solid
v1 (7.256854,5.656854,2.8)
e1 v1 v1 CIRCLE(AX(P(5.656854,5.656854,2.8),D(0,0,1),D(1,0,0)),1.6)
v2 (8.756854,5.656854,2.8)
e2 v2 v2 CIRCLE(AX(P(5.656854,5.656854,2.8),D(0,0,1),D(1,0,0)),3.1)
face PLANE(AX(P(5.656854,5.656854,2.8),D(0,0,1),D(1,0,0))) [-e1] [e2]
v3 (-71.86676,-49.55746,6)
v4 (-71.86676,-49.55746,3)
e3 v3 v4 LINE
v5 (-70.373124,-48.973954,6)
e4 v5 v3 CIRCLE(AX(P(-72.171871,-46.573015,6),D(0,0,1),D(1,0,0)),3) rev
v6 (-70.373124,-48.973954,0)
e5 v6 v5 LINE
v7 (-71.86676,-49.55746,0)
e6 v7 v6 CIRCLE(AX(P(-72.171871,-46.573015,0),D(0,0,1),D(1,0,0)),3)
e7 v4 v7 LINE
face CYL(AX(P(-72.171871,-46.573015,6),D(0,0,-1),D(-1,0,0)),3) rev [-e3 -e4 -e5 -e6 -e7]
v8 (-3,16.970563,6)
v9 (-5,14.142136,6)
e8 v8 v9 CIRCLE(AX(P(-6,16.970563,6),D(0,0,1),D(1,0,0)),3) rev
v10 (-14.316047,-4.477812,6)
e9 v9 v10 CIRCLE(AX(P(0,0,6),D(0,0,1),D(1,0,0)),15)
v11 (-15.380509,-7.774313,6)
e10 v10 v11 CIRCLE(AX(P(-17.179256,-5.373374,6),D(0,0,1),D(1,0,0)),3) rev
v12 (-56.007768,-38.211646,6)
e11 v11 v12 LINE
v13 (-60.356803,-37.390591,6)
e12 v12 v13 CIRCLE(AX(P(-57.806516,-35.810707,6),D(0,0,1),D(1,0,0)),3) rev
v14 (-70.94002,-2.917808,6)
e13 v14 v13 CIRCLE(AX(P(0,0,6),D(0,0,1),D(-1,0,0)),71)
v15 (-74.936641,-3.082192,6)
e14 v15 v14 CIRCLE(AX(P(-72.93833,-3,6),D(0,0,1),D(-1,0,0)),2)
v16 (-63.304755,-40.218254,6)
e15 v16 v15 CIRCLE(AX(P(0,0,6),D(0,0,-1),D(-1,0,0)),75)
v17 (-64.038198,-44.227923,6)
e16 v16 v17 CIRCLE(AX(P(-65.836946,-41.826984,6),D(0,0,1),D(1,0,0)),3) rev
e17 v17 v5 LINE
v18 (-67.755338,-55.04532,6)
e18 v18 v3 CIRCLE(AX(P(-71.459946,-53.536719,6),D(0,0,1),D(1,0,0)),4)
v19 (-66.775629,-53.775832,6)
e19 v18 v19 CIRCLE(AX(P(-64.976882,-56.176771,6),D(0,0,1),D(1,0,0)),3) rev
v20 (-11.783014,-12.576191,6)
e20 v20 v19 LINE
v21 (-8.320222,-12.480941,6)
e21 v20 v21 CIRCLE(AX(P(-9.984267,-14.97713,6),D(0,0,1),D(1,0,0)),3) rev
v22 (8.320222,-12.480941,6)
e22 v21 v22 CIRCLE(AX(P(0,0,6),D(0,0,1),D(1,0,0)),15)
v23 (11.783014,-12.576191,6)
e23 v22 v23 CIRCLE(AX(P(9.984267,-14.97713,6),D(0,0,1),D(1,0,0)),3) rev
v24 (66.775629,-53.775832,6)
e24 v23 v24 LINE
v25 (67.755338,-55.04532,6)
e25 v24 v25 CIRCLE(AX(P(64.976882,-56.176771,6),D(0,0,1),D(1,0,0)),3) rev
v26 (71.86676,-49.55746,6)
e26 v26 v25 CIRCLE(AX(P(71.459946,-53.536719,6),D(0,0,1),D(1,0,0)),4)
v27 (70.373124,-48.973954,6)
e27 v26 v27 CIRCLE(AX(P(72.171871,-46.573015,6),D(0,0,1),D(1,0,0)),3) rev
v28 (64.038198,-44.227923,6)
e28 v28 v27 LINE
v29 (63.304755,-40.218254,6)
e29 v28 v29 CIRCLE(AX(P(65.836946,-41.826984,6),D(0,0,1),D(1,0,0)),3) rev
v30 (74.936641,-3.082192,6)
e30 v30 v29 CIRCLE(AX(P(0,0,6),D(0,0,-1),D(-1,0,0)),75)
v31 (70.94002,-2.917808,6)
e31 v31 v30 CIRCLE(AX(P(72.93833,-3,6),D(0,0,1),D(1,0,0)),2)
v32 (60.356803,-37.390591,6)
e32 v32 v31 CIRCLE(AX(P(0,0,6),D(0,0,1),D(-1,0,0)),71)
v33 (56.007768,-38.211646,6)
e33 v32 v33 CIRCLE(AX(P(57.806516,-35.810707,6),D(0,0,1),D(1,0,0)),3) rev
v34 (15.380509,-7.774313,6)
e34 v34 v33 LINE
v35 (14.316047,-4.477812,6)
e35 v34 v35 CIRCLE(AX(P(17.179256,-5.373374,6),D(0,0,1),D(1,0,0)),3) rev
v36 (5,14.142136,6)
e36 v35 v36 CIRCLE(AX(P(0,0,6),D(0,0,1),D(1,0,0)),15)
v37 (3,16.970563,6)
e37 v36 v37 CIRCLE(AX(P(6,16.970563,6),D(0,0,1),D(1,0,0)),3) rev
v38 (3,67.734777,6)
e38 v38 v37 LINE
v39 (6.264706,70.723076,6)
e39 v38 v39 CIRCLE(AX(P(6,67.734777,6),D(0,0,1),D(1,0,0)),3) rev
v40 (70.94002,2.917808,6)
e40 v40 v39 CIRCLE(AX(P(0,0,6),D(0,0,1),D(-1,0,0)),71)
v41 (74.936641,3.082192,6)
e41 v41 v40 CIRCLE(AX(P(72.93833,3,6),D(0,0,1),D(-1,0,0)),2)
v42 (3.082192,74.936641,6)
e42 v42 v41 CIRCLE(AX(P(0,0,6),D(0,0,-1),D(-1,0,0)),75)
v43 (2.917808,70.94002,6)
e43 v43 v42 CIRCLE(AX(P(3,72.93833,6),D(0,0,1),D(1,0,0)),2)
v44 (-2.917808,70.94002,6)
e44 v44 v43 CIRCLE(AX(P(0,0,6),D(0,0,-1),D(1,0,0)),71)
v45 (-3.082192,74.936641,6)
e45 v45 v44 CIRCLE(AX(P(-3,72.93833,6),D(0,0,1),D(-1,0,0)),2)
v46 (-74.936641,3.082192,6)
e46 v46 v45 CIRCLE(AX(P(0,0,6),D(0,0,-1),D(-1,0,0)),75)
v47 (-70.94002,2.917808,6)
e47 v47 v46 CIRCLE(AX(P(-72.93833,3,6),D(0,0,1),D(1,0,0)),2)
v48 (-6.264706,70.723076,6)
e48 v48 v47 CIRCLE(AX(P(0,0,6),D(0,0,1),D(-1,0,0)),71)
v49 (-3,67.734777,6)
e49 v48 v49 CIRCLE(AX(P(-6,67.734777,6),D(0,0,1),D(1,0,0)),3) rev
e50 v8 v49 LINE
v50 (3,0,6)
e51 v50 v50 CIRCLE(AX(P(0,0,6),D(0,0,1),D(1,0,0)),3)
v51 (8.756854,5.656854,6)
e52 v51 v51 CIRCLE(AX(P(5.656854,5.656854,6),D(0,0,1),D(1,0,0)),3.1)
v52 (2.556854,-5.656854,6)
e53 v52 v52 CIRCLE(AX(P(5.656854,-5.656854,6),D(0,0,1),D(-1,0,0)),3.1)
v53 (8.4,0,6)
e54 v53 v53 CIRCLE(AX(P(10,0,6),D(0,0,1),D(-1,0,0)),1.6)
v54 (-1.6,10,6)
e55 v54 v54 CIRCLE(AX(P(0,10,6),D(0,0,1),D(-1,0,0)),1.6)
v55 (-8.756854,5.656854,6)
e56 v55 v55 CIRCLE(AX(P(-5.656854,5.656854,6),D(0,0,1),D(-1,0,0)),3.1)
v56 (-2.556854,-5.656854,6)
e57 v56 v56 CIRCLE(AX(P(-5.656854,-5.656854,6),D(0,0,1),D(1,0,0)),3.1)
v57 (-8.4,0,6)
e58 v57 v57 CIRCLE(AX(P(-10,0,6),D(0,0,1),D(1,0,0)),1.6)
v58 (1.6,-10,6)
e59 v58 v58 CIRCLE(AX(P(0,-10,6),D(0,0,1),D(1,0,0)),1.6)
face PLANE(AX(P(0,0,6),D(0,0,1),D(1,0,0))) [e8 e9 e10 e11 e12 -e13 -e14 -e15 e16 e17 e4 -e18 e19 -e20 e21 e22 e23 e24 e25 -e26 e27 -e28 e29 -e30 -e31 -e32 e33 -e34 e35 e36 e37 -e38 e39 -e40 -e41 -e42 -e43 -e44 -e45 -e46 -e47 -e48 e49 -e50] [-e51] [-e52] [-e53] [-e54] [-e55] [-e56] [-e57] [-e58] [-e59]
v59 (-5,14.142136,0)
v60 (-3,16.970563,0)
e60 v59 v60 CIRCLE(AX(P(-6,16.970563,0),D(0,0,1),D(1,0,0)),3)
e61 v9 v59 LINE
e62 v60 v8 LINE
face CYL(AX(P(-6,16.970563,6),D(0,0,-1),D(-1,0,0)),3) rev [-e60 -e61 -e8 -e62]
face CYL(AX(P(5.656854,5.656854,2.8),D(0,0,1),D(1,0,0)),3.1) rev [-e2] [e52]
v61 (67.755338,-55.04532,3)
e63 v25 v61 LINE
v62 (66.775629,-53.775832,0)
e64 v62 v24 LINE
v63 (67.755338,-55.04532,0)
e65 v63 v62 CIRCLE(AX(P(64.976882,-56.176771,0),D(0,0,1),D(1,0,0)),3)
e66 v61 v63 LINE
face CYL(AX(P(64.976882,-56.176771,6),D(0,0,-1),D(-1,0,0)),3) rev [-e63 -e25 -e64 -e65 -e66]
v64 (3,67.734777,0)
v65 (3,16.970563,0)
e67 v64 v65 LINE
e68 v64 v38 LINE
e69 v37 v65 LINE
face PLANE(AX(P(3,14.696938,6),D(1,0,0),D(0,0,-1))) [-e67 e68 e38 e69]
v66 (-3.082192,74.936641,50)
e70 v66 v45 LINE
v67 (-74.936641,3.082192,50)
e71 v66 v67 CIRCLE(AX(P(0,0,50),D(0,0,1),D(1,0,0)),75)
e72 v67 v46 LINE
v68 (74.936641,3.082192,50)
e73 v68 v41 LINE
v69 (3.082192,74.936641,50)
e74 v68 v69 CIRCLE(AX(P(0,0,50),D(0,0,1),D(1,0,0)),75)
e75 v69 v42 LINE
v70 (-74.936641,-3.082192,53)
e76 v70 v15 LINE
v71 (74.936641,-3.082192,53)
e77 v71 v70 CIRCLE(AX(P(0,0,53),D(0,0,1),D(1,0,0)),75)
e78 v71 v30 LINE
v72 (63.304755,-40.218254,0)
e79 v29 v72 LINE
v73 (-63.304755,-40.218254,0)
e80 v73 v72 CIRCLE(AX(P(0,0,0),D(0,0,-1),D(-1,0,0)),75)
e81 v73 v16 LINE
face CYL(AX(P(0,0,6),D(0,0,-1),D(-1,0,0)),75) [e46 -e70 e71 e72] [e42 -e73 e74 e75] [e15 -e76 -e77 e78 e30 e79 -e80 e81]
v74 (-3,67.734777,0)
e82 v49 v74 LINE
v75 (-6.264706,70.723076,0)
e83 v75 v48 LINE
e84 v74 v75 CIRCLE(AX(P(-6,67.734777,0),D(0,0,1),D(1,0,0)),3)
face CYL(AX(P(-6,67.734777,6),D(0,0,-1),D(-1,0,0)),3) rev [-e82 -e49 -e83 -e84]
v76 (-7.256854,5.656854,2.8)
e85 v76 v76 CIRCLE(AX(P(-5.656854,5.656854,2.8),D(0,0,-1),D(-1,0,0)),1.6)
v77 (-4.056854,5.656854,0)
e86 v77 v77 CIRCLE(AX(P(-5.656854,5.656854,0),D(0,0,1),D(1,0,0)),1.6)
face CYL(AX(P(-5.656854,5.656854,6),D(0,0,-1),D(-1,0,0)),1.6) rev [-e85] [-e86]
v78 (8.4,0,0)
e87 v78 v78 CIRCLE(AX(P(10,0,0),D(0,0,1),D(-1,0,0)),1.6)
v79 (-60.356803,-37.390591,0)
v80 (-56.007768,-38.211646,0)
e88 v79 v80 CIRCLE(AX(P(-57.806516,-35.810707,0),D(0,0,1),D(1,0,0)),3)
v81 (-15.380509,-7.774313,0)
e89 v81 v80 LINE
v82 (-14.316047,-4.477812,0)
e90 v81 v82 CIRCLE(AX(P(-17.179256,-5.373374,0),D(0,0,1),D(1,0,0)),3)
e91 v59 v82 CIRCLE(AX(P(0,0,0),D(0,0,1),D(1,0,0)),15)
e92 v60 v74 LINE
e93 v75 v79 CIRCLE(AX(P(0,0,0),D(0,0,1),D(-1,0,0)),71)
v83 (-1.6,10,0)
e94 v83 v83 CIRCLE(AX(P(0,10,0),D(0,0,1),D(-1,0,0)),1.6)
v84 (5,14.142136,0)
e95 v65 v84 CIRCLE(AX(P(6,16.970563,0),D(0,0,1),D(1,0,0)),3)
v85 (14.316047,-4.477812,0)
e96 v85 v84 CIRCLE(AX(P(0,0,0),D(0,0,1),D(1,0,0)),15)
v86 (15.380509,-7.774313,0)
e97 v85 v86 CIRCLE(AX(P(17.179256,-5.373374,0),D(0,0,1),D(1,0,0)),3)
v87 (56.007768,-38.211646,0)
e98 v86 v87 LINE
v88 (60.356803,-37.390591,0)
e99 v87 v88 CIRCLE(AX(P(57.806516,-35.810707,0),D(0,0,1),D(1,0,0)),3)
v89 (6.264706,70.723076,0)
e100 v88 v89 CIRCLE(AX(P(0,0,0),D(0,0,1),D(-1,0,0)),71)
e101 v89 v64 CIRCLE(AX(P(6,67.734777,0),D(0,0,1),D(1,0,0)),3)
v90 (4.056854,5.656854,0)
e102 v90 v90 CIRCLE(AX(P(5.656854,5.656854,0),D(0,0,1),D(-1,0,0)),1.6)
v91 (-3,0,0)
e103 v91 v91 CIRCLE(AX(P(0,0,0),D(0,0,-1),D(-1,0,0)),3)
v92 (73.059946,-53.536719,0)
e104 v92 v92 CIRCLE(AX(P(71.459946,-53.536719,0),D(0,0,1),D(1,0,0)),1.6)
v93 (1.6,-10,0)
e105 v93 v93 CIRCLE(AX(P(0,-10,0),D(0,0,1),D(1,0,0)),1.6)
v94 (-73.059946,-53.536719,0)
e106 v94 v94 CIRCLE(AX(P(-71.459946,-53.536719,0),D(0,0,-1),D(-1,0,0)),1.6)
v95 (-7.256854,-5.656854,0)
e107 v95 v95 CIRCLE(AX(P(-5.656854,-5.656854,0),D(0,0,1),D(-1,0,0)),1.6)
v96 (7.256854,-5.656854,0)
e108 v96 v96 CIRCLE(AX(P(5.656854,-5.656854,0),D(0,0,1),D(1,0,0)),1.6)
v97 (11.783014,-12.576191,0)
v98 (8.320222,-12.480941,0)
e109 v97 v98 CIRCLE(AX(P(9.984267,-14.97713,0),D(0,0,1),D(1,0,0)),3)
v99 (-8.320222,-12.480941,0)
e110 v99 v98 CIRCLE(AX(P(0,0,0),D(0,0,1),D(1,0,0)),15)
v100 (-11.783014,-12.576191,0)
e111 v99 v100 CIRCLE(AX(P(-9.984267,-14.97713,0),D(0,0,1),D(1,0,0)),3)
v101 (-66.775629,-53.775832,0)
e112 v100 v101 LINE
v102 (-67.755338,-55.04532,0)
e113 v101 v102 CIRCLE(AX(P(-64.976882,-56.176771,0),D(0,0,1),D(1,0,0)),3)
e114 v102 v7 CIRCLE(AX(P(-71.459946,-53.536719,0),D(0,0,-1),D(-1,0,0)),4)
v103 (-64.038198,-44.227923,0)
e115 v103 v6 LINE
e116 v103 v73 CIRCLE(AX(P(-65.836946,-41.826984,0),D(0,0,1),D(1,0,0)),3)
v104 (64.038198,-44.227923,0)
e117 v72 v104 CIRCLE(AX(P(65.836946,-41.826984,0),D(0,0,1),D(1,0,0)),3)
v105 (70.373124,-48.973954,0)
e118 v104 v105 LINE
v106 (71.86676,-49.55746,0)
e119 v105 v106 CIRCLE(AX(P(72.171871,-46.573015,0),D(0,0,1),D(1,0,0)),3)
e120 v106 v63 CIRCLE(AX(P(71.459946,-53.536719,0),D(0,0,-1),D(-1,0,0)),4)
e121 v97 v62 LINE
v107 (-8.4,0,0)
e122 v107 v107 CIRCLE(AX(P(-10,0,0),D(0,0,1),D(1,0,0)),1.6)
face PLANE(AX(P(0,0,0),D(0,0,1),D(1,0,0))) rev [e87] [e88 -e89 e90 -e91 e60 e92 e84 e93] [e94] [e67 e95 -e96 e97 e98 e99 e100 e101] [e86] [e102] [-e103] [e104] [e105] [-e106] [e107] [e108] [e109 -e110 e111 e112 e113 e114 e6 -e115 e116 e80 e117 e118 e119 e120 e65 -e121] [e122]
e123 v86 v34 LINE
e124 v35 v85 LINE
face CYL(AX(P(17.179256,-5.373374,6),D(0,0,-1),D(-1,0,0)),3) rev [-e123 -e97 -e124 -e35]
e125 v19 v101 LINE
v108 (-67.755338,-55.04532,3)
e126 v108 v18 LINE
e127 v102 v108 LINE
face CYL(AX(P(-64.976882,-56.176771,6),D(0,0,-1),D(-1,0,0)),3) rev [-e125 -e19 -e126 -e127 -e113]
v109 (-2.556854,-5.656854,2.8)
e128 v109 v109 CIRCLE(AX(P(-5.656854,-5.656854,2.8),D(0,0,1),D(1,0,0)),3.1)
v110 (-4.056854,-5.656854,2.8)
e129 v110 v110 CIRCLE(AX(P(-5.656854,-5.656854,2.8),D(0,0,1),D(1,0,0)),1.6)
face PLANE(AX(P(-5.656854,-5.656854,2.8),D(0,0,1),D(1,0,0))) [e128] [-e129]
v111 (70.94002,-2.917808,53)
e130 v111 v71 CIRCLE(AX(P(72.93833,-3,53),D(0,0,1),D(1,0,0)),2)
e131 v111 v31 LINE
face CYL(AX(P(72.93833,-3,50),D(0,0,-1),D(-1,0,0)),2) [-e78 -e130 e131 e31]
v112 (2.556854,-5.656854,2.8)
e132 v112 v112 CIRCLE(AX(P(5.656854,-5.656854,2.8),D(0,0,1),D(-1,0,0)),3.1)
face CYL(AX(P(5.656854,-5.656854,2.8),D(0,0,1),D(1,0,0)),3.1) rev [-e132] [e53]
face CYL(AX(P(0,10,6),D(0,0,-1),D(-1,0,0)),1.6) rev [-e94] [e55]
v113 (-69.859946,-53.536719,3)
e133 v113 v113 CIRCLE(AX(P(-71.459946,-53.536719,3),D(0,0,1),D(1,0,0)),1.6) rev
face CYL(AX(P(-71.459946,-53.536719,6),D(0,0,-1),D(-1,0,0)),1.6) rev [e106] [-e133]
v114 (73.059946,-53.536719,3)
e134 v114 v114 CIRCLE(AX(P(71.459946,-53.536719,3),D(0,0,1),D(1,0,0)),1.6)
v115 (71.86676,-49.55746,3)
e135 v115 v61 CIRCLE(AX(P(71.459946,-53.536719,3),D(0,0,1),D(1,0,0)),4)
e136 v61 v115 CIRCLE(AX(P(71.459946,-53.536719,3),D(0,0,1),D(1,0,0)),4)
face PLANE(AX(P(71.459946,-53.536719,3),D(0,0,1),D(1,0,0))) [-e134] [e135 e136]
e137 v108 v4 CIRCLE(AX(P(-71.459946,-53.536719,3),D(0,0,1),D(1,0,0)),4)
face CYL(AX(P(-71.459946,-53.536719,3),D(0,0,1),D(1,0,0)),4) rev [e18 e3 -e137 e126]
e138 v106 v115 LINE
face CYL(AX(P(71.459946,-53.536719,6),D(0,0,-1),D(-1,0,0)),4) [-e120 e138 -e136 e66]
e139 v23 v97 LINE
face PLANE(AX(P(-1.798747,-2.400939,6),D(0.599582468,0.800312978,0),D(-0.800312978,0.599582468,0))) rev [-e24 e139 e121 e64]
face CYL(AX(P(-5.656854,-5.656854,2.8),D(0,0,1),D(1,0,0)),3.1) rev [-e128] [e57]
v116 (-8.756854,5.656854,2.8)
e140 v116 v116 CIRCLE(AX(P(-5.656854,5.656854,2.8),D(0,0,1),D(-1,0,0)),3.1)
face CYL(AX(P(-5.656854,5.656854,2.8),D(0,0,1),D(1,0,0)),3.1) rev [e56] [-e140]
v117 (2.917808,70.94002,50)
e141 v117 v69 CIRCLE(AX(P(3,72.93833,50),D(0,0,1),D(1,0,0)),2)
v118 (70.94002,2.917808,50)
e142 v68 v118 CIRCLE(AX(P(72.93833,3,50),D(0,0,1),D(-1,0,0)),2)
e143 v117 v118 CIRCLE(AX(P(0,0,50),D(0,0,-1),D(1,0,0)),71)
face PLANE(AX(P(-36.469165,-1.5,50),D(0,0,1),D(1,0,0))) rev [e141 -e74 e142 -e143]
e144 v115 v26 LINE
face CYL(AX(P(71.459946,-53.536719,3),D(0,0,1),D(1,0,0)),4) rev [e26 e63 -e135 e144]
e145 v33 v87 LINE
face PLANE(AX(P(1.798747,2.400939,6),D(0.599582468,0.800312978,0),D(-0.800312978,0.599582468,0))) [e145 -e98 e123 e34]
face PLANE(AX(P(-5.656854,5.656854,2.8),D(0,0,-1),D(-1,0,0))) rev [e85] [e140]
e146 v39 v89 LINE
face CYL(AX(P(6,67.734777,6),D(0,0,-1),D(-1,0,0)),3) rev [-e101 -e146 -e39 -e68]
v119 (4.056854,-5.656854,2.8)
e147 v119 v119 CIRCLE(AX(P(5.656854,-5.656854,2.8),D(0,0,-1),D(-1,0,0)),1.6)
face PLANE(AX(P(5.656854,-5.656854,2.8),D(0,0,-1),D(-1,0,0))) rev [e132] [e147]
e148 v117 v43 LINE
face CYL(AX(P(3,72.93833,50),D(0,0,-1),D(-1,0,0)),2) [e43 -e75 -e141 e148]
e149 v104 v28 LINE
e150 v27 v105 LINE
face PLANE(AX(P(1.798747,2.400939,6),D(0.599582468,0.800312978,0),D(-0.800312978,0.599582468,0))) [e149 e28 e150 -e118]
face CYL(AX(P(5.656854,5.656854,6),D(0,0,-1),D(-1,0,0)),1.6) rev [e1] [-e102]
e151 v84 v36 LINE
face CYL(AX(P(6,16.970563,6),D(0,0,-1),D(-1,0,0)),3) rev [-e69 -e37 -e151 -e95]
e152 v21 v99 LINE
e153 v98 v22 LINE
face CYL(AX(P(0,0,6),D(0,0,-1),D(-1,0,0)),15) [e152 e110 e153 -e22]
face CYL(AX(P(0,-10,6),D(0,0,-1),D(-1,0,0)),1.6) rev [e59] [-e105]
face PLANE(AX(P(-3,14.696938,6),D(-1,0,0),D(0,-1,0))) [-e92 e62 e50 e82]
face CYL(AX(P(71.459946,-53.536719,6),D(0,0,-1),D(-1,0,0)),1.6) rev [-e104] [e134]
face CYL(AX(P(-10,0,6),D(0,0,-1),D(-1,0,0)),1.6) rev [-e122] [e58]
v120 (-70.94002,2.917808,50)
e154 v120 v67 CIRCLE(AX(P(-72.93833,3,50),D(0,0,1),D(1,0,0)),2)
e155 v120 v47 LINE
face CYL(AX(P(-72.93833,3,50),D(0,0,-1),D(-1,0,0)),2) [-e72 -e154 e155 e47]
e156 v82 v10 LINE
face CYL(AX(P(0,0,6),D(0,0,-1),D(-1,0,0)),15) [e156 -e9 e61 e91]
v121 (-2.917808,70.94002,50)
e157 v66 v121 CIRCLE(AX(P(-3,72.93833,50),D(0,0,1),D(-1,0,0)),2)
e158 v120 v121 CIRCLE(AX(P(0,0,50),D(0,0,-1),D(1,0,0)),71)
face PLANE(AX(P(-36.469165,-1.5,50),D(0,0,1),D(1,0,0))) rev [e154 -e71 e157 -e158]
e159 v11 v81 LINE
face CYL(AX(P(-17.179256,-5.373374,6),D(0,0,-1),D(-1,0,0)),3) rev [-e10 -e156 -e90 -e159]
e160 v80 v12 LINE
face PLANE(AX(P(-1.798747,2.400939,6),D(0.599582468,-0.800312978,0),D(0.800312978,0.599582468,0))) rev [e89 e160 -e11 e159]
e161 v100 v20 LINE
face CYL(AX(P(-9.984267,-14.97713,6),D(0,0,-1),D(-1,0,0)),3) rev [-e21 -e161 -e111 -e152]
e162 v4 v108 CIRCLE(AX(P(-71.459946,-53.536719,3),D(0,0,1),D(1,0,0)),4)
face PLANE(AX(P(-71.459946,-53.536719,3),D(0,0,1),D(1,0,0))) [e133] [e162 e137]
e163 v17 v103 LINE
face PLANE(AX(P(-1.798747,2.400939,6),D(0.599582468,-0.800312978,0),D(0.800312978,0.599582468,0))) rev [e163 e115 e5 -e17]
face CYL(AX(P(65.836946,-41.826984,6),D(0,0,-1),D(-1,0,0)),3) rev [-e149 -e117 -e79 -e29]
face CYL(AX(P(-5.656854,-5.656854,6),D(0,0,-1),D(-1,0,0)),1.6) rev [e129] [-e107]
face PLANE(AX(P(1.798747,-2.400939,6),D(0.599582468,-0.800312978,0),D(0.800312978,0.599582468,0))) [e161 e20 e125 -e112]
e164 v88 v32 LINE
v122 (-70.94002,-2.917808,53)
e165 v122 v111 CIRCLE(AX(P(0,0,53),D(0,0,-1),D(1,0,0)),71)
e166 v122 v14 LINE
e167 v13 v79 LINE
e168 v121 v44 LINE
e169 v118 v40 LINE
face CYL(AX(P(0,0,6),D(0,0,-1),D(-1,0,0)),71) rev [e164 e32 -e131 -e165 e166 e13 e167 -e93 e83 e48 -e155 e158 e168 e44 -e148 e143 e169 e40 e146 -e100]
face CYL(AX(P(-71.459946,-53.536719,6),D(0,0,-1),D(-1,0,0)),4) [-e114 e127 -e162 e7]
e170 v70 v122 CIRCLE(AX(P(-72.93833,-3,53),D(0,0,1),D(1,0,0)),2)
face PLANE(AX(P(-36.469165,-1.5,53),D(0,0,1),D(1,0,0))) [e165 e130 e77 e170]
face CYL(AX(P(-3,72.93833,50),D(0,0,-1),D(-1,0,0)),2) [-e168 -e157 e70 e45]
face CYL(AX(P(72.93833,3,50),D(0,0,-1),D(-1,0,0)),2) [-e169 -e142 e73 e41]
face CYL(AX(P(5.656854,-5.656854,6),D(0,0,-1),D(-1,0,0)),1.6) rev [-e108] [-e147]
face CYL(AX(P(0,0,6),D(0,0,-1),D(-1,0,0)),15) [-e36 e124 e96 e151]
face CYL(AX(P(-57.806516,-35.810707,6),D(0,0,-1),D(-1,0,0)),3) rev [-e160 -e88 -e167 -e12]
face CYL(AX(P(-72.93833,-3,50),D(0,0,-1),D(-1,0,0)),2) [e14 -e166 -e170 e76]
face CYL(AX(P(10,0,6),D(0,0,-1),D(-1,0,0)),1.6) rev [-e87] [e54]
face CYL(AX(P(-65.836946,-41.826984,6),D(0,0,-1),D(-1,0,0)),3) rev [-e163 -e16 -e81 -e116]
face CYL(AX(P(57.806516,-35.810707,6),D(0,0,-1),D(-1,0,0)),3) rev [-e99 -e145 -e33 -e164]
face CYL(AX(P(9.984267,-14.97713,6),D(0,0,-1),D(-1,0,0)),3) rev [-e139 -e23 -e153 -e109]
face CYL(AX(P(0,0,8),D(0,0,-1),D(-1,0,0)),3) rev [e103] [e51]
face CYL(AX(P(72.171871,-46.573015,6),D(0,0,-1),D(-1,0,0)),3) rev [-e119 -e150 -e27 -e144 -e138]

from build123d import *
from build123d.topology import SkipClean

# Parameters (mm, degrees)
SKETCH_1_R          = 15
SKETCH_1_R_2        = 1.6
EXTRUDE_1_DEPTH     = 6
SKETCH_2_R          = 3.1
CUT_EXTRUDE_1_DEPTH = 3.2
SKETCH_4_R          = 3
CUT_EXTRUDE_2_DEPTH = 8
EXTRUDE_3_DEPTH     = 6
SKETCH_5_R          = 1.6
CUT_EXTRUDE_3_DEPTH = 6
SKETCH_6_R          = 4
SKETCH_6_R_2        = 1.6
EXTRUDE_4_DEPTH     = 6
CUT_EXTRUDE_4_DEPTH = 6
EXTRUDE_5_DEPTH     = 6
EXTRUDE_6_DEPTH     = 6
EXTRUDE_7_DEPTH     = 44
EXTRUDE_8_DEPTH     = 3
FILLET_5_R          = 3
CUT_EXTRUDE_START   = -40
CUT_EXTRUDE_5_DEPTH = 40
FILLET_6_R          = 3
CUT_EXTRUDE_START_2 = -3
SKETCH_13_R         = 4
CUT_EXTRUDE_6_DEPTH = 3


with BuildPart() as part:
    # 草图1 → 凸台-拉伸1 (new body)
    with BuildSketch(Plane.XY):
        Circle(SKETCH_1_R)
        with Locations((5.656854249, -5.656854249)):
            Circle(SKETCH_1_R_2, mode=Mode.SUBTRACT)
        with Locations(Location((-5.656854249, -5.656854249, 0), (0, 0, 180))):
            Circle(SKETCH_1_R_2, mode=Mode.SUBTRACT)
        with Locations(Location((5.656854249, 5.656854249, 0), (0, 0, 180))):
            Circle(SKETCH_1_R_2, mode=Mode.SUBTRACT)
        with Locations((-5.656854249, 5.656854249)):
            Circle(SKETCH_1_R_2, mode=Mode.SUBTRACT)
        with Locations((0, -10)):
            Circle(SKETCH_1_R_2, mode=Mode.SUBTRACT)
        with Locations(Location((10, 0, 0), (0, 0, 180))):
            Circle(SKETCH_1_R_2, mode=Mode.SUBTRACT)
        with Locations((-10, 0)):
            Circle(SKETCH_1_R_2, mode=Mode.SUBTRACT)
        with Locations(Location((0, 10, 0), (0, 0, 180))):
            Circle(SKETCH_1_R_2, mode=Mode.SUBTRACT)
    extrude(amount=EXTRUDE_1_DEPTH)

    # 草图2 → 切除-拉伸1 (cut)
    with BuildSketch(Plane.XY.offset(6)):
        with Locations((5.656854249, 5.656854249)):
            Circle(SKETCH_2_R)
        with Locations(Location((5.656854249, -5.656854249, 0), (0, 0, 180))):
            Circle(SKETCH_2_R)
        with Locations((-5.656854249, -5.656854249)):
            Circle(SKETCH_2_R)
        with Locations(Location((-5.656854249, 5.656854249, 0), (0, 0, 180))):
            Circle(SKETCH_2_R)
    extrude(amount=-CUT_EXTRUDE_1_DEPTH, mode=Mode.SUBTRACT)

    # 草图4 → 切除-拉伸2 (cut)
    with BuildSketch(Plane(origin=(0, 0, 0), x_dir=(-1, 0, 0), z_dir=(0, 0, -1))):
        Circle(SKETCH_4_R)
    extrude(amount=-CUT_EXTRUDE_2_DEPTH, mode=Mode.SUBTRACT)

    # 草图3 → 凸台-拉伸3 (add)
    with BuildSketch(Plane(origin=(0, 0, 0), x_dir=(-1, 0, 0), z_dir=(0, 0, -1))):
        with BuildLine():
            Line((76.421330741, -53.505180196), (13.560897996, -6.411087703))
            ThreePointArc((13.560897996, -6.411087703), (12.004694677, -8.993737027), (9.963403186, -11.212965574))
            Line((9.963403186, -11.212965574), (72.82383593, -58.307058067))
            Line((72.82383593, -58.307058067), (76.421330741, -53.505180196))
        make_face()
    extrude_3 = extrude(amount=-EXTRUDE_3_DEPTH)

    # 草图5 → 切除-拉伸3 (cut)
    with BuildSketch(Plane(origin=(0, 0, 0), x_dir=(-1, 0, 0), z_dir=(0, 0, -1))):
        with Locations((71.459945849, -53.536718608)):
            Circle(SKETCH_5_R)
    cut_extrude_3 = extrude(amount=-CUT_EXTRUDE_3_DEPTH, mode=Mode.SUBTRACT)

    # 镜向2: 凸台-拉伸3, 切除-拉伸3 across plane
    add(extrude_3.mirror(Plane(origin=(0, 0, 0), x_dir=(0, 0, 1), z_dir=(1, 0, 0))))
    add(cut_extrude_3.mirror(Plane(origin=(0, 0, 0), x_dir=(0, 0, 1), z_dir=(1, 0, 0))), mode=Mode.SUBTRACT)

    # 草图6 → 凸台-拉伸4 (add)
    # profile 1 of 2: a face of its own
    with BuildSketch(Plane(origin=(0, 0, 0), x_dir=(-1, 0, 0), z_dir=(0, 0, -1))):
        with Locations((-71.459945849, -53.536718608)):
            Circle(SKETCH_6_R)
        with Locations(Location((-71.459945849, -53.536718608, 0), (0, 0, 180))):
            Circle(SKETCH_6_R_2, mode=Mode.SUBTRACT)
    # profile 2 of 2: a face of its own
    with BuildSketch(Plane(origin=(0, 0, 0), x_dir=(-1, 0, 0), z_dir=(0, 0, -1))):
        with Locations((71.459945849, -53.536718608)):
            Circle(SKETCH_6_R)
        with Locations((71.459945849, -53.536718608)):
            Circle(SKETCH_6_R_2, mode=Mode.SUBTRACT)
    extrude(amount=-EXTRUDE_4_DEPTH)

    # 草图7 → 切除-拉伸4 (cut)
    with SkipClean():  # the faces are left unmerged after this step: merging them gives an invalid solid
        with BuildSketch(Plane(origin=(0, 0, 0), x_dir=(-1, 0, 0), z_dir=(0, 0, -1))):
            with BuildLine():
                Line((-75.376122366, -52.722125774), (-79.586843911, -53.536718608))
                Line((-79.586843911, -53.536718608), (-72.314041728, -61.42988757))
                Line((-72.314041728, -61.42988757), (-71.890261821, -57.513504768))
                ThreePointArc((-71.890261821, -57.513504768), (-74.694497967, -55.889944605), (-75.376122366, -52.722125774))
            make_face()
            with BuildLine():
                Line((71.778627556, -57.524003645), (73.252520332, -62.461845531))
                Line((73.252520332, -62.461845531), (79.851137719, -53.043072165))
                Line((79.851137719, -53.043072165), (75.376122366, -52.722125774))
                ThreePointArc((75.376122366, -52.722125774), (74.661197763, -55.935048481), (71.778627556, -57.524003645))
            make_face()
        extrude(amount=-CUT_EXTRUDE_4_DEPTH, mode=Mode.SUBTRACT)

    # 草图8 → 凸台-拉伸5 (add)
    with SkipClean():  # the faces are left unmerged after this step: merging them gives an invalid solid
        with BuildSketch(Plane(origin=(0, 0, 0), x_dir=(-1, 0, 0), z_dir=(0, 0, -1))):
            with BuildLine():
                Line((-58.570222155, -40.131397642), (-61.77418279, -42.531756848))
                ThreePointArc((-61.77418279, -42.531756848), (0, 75), (61.77418279, -42.531756848))
                Line((61.77418279, -42.531756848), (58.570222155, -40.131397642))
                ThreePointArc((58.570222155, -40.131397642), (0, 71), (-58.570222155, -40.131397642))
            make_face()
        extrude(amount=-EXTRUDE_5_DEPTH)

    # 草图9 → 凸台-拉伸6 (add)
    with SkipClean():  # the faces are left unmerged after this step: merging them gives an invalid solid
        with BuildSketch(Plane(origin=(0, 0, 0), x_dir=(-1, 0, 0), z_dir=(0, 0, -1))):
            with BuildLine():
                Line((-3, 14.696938457), (-3, 70.936591404))
                ThreePointArc((-3, 70.936591404), (0, 71), (3, 70.936591404))
                Line((3, 70.936591404), (3, 14.696938457))
                ThreePointArc((3, 14.696938457), (0, 15), (-3, 14.696938457))
            make_face()
        extrude(amount=-EXTRUDE_6_DEPTH)

    # 草图10 → 凸台-拉伸7 (add)
    with SkipClean():  # the faces are left unmerged after this step: merging them gives an invalid solid
        with BuildSketch(Plane.XY.offset(6)):
            with BuildLine():
                ThreePointArc((-74.936640529, 3.082191781), (-75, 0), (-74.936640529, -3.082191781))
                ThreePointArc((-74.936640529, -3.082191781), (-72.856138334, -4.998310414), (-70.940019701, -2.917808219))
                ThreePointArc((-70.940019701, -2.917808219), (-71, 0), (-70.940019701, 2.917808219))
                ThreePointArc((-70.940019701, 2.917808219), (-72.856138334, 4.998310414), (-74.936640529, 3.082191781))
            make_face()
            with BuildLine():
                ThreePointArc((2.917808219, 70.940019701), (0, 71), (-2.917808219, 70.940019701))
                ThreePointArc((-2.917808219, 70.940019701), (-4.998310414, 72.856138334), (-3.082191781, 74.936640529))
                ThreePointArc((-3.082191781, 74.936640529), (0, 75), (3.082191781, 74.936640529))
                ThreePointArc((3.082191781, 74.936640529), (4.998310414, 72.856138334), (2.917808219, 70.940019701))
            make_face()
            with BuildLine():
                ThreePointArc((70.940019701, -2.917808219), (71, 0), (70.940019701, 2.917808219))
                ThreePointArc((70.940019701, 2.917808219), (72.856138334, 4.998310414), (74.936640529, 3.082191781))
                ThreePointArc((74.936640529, 3.082191781), (75, 0), (74.936640529, -3.082191781))
                ThreePointArc((74.936640529, -3.082191781), (72.856138334, -4.998310414), (70.940019701, -2.917808219))
            make_face()
        extrude(amount=EXTRUDE_7_DEPTH)

    # 草图11 → 凸台-拉伸8 (add)
    with SkipClean():  # the faces are left unmerged after this step: merging them gives an invalid solid
        with BuildSketch(Plane.XY.offset(50)):
            with BuildLine():
                ThreePointArc((70.940019701, -2.917808219), (0, 71), (-70.940019701, -2.917808219))
                ThreePointArc((-70.940019701, -2.917808219), (-72.856138334, -4.998310414), (-74.936640529, -3.082191781))
                ThreePointArc((-74.936640529, -3.082191781), (0, 75), (74.936640529, -3.082191781))
                ThreePointArc((74.936640529, -3.082191781), (72.856138334, -4.998310414), (70.940019701, -2.917808219))
            make_face()
        extrude(amount=EXTRUDE_8_DEPTH)

    # 圆角5
    # the kernel refuses this fillet: 3 mm, written as the material it adds along each edge
    with BuildSketch(Plane(origin=(13.560897996, -6.411087703, 0), x_dir=(0.3638350971602613, 0.9314633766683386, 0), z_dir=(0, 0, 1)), Plane(origin=(-3, 14.696938457, 0), x_dir=(-0.96361137499428, -0.2673071603635661, 0), z_dir=(0, 0, 1)), Plane(origin=(-9.963403186, -11.212965574, 0), x_dir=(0.7916938765224899, -0.610918002580373, 0), z_dir=(0, 0, 1))) as fillet_5_piece_1:
        with BuildLine():
            CenterArc((2.283078072, -2.992811711), FILLET_5_R, 93.967130801, 70.528779366)
            Line((-0.607756053, -2.19089023), (0, 0))
            ThreePointArc((0, 0), (1.03776276, -0.035941444), (2.07552552, 0))
        make_face()
    extrude(amount=6)
    with BuildSketch(Plane(origin=(9.963403186, -11.212965574, 0), x_dir=(-0.7916938765224897, -0.6109180025803732, 0), z_dir=(0, 0, 1)), Plane(origin=(3, 14.696938457, 0), x_dir=(0.9636113749942801, -0.2673071603635656, 0), z_dir=(0, 0, 1))) as fillet_5_piece_2:
        with BuildLine():
            CenterArc((2.283078072, 2.992811711), FILLET_5_R, 195.504089834, 70.528779366)
            Line((-0.607756053, 2.19089023), (0, 0))
            ThreePointArc((0, 0), (1.03776276, 0.035941444), (2.07552552, 0))
        make_face()
    extrude(amount=6)
    with BuildSketch(Plane(origin=(67.543769332, -54.351311441, 6), x_dir=(-0.8003129784856748, 0.5995824684456574, 0), z_dir=(0, 0, -1)), Plane(origin=(-71.141264142, -49.54943357, 6), x_dir=(0.8003129784856854, 0.5995824684456432, 0), z_dir=(0, 0, -1))) as fillet_5_piece_3:
        with BuildLine():
            CenterArc((0.959799964, -3), FILLET_5_R, 90, 31.002719134)
            ThreePointArc((-0.585436297, -0.428571429), (-0.282981023, -0.227586802), (0, 0))
            Line((0, 0), (0.959799964, 0))
        make_face()
    extrude(amount=6)
    with BuildSketch(Plane(origin=(71.141264142, -49.54943357, 6), x_dir=(-0.8003129784856889, 0.5995824684456385, 0), z_dir=(0, 0, -1)), Plane(origin=(-67.543769332, -54.351311441, 6), x_dir=(0.8003129784856765, 0.5995824684456551, 0), z_dir=(0, 0, -1))) as fillet_5_piece_4:
        with BuildLine():
            CenterArc((0.959799964, 3), FILLET_5_R, 238.997280866, 31.002719134)
            ThreePointArc((-0.585436297, 0.428571429), (-0.282981023, 0.227586802), (0, 0))
            Line((0, 0), (0.959799964, 0))
        make_face()
    extrude(amount=6)
    with BuildSketch(Plane(origin=(-58.570222155, -40.131397642, 0), x_dir=(0.800312978485684, 0.5995824684456454, 0), z_dir=(0, 0, 1))) as fillet_5_piece_5:
        with BuildLine():
            CenterArc((3.201814516, 3), FILLET_5_R, 174.937907036, 95.062092964)
            ThreePointArc((0.213515536, 3.264705882), (0.087950563, 1.633582954), (0, 0))
            Line((0, 0), (3.201814516, 0))
        make_face()
    extrude(amount=6)
    with BuildSketch(Plane(origin=(58.570222155, -40.131397642, 0), x_dir=(-0.8003129784856812, 0.5995824684456489, 0), z_dir=(0, 0, 1))) as fillet_5_piece_6:
        with BuildLine():
            CenterArc((3.201814516, -3), FILLET_5_R, 90, 95.062092964)
            ThreePointArc((0.213515536, -3.264705882), (0.087950563, -1.633582954), (0, 0))
            Line((0, 0), (3.201814516, 0))
        make_face()
    extrude(amount=6)
    with BuildSketch(Plane(origin=(61.77418279, -42.531756848, 0), x_dir=(0.8003129784856843, -0.599582468445645, 0), z_dir=(0, 0, 1))) as fillet_5_piece_7:
        with BuildLine():
            CenterArc((2.8289124, 3), FILLET_5_R, 184.411725786, 85.588274214)
            ThreePointArc((-0.162198691, 2.769230769), (-0.068295281, 1.385365341), (0, 0))
            Line((0, 0), (2.8289124, 0))
        make_face()
    extrude(amount=6)
    with BuildSketch(Plane(origin=(-61.77418279, -42.531756848, 0), x_dir=(-0.8003129784856826, -0.5995824684456469, 0), z_dir=(0, 0, 1))) as fillet_5_piece_8:
        with BuildLine():
            CenterArc((2.8289124, -3), FILLET_5_R, 90, 85.588274214)
            ThreePointArc((-0.162198691, -2.769230769), (-0.068295281, -1.385365341), (0, 0))
            Line((0, 0), (2.8289124, 0))
        make_face()
    extrude(amount=6)
    with BuildSketch(Plane(origin=(-13.560897996, -6.411087703, 0), x_dir=(-0.8003129784856828, -0.5995824684456466, 0), z_dir=(0, 0, 1))) as fillet_5_piece_9:
        with BuildLine():
            CenterArc((2.273624292, -3), FILLET_5_R, 90, 70.528779366)
            ThreePointArc((-0.554802833, -2), (-0.242767832, -1.009607405), (0, 0))
            Line((0, 0), (2.273624292, 0))
        make_face()
    extrude(amount=6)

    # 草图12 → 切除-拉伸5 (cut)
    with BuildSketch(Plane.XY.offset(6).offset(CUT_EXTRUDE_START)):
        with BuildLine():
            Line((74.557628178, -56.067403137), (72.111653049, -59.061396994))
            Line((72.111653049, -59.061396994), (69.533618756, -58.720186573))
            Line((69.533618756, -58.720186573), (69.741593923, -57.148818642))
            ThreePointArc((69.741593923, -57.148818642), (72.336303632, -57.439537721), (74.557628178, -56.067403137))
        make_face()
    extrude(amount=CUT_EXTRUDE_5_DEPTH, mode=Mode.SUBTRACT)

    # 圆角6
    fillet_6_edges = [part.edges().sort_by_distance(p)[0] for p in [
        (3, 70.936591404, 3),
        (-3, 70.936591404, 3),
    ]]
    fillet(fillet_6_edges, radius=FILLET_6_R)

    # 草图13 → 切除-拉伸6 (cut)
    with BuildSketch(Plane.XY.offset(6).offset(CUT_EXTRUDE_START_2)):
        with Locations((-71.459945849, -53.536718608)):
            Circle(SKETCH_13_R)
        with Locations((71.459945849, -53.536718608)):
            Circle(SKETCH_13_R)
    extrude(amount=CUT_EXTRUDE_6_DEPTH, mode=Mode.SUBTRACT)


solid = part.part
